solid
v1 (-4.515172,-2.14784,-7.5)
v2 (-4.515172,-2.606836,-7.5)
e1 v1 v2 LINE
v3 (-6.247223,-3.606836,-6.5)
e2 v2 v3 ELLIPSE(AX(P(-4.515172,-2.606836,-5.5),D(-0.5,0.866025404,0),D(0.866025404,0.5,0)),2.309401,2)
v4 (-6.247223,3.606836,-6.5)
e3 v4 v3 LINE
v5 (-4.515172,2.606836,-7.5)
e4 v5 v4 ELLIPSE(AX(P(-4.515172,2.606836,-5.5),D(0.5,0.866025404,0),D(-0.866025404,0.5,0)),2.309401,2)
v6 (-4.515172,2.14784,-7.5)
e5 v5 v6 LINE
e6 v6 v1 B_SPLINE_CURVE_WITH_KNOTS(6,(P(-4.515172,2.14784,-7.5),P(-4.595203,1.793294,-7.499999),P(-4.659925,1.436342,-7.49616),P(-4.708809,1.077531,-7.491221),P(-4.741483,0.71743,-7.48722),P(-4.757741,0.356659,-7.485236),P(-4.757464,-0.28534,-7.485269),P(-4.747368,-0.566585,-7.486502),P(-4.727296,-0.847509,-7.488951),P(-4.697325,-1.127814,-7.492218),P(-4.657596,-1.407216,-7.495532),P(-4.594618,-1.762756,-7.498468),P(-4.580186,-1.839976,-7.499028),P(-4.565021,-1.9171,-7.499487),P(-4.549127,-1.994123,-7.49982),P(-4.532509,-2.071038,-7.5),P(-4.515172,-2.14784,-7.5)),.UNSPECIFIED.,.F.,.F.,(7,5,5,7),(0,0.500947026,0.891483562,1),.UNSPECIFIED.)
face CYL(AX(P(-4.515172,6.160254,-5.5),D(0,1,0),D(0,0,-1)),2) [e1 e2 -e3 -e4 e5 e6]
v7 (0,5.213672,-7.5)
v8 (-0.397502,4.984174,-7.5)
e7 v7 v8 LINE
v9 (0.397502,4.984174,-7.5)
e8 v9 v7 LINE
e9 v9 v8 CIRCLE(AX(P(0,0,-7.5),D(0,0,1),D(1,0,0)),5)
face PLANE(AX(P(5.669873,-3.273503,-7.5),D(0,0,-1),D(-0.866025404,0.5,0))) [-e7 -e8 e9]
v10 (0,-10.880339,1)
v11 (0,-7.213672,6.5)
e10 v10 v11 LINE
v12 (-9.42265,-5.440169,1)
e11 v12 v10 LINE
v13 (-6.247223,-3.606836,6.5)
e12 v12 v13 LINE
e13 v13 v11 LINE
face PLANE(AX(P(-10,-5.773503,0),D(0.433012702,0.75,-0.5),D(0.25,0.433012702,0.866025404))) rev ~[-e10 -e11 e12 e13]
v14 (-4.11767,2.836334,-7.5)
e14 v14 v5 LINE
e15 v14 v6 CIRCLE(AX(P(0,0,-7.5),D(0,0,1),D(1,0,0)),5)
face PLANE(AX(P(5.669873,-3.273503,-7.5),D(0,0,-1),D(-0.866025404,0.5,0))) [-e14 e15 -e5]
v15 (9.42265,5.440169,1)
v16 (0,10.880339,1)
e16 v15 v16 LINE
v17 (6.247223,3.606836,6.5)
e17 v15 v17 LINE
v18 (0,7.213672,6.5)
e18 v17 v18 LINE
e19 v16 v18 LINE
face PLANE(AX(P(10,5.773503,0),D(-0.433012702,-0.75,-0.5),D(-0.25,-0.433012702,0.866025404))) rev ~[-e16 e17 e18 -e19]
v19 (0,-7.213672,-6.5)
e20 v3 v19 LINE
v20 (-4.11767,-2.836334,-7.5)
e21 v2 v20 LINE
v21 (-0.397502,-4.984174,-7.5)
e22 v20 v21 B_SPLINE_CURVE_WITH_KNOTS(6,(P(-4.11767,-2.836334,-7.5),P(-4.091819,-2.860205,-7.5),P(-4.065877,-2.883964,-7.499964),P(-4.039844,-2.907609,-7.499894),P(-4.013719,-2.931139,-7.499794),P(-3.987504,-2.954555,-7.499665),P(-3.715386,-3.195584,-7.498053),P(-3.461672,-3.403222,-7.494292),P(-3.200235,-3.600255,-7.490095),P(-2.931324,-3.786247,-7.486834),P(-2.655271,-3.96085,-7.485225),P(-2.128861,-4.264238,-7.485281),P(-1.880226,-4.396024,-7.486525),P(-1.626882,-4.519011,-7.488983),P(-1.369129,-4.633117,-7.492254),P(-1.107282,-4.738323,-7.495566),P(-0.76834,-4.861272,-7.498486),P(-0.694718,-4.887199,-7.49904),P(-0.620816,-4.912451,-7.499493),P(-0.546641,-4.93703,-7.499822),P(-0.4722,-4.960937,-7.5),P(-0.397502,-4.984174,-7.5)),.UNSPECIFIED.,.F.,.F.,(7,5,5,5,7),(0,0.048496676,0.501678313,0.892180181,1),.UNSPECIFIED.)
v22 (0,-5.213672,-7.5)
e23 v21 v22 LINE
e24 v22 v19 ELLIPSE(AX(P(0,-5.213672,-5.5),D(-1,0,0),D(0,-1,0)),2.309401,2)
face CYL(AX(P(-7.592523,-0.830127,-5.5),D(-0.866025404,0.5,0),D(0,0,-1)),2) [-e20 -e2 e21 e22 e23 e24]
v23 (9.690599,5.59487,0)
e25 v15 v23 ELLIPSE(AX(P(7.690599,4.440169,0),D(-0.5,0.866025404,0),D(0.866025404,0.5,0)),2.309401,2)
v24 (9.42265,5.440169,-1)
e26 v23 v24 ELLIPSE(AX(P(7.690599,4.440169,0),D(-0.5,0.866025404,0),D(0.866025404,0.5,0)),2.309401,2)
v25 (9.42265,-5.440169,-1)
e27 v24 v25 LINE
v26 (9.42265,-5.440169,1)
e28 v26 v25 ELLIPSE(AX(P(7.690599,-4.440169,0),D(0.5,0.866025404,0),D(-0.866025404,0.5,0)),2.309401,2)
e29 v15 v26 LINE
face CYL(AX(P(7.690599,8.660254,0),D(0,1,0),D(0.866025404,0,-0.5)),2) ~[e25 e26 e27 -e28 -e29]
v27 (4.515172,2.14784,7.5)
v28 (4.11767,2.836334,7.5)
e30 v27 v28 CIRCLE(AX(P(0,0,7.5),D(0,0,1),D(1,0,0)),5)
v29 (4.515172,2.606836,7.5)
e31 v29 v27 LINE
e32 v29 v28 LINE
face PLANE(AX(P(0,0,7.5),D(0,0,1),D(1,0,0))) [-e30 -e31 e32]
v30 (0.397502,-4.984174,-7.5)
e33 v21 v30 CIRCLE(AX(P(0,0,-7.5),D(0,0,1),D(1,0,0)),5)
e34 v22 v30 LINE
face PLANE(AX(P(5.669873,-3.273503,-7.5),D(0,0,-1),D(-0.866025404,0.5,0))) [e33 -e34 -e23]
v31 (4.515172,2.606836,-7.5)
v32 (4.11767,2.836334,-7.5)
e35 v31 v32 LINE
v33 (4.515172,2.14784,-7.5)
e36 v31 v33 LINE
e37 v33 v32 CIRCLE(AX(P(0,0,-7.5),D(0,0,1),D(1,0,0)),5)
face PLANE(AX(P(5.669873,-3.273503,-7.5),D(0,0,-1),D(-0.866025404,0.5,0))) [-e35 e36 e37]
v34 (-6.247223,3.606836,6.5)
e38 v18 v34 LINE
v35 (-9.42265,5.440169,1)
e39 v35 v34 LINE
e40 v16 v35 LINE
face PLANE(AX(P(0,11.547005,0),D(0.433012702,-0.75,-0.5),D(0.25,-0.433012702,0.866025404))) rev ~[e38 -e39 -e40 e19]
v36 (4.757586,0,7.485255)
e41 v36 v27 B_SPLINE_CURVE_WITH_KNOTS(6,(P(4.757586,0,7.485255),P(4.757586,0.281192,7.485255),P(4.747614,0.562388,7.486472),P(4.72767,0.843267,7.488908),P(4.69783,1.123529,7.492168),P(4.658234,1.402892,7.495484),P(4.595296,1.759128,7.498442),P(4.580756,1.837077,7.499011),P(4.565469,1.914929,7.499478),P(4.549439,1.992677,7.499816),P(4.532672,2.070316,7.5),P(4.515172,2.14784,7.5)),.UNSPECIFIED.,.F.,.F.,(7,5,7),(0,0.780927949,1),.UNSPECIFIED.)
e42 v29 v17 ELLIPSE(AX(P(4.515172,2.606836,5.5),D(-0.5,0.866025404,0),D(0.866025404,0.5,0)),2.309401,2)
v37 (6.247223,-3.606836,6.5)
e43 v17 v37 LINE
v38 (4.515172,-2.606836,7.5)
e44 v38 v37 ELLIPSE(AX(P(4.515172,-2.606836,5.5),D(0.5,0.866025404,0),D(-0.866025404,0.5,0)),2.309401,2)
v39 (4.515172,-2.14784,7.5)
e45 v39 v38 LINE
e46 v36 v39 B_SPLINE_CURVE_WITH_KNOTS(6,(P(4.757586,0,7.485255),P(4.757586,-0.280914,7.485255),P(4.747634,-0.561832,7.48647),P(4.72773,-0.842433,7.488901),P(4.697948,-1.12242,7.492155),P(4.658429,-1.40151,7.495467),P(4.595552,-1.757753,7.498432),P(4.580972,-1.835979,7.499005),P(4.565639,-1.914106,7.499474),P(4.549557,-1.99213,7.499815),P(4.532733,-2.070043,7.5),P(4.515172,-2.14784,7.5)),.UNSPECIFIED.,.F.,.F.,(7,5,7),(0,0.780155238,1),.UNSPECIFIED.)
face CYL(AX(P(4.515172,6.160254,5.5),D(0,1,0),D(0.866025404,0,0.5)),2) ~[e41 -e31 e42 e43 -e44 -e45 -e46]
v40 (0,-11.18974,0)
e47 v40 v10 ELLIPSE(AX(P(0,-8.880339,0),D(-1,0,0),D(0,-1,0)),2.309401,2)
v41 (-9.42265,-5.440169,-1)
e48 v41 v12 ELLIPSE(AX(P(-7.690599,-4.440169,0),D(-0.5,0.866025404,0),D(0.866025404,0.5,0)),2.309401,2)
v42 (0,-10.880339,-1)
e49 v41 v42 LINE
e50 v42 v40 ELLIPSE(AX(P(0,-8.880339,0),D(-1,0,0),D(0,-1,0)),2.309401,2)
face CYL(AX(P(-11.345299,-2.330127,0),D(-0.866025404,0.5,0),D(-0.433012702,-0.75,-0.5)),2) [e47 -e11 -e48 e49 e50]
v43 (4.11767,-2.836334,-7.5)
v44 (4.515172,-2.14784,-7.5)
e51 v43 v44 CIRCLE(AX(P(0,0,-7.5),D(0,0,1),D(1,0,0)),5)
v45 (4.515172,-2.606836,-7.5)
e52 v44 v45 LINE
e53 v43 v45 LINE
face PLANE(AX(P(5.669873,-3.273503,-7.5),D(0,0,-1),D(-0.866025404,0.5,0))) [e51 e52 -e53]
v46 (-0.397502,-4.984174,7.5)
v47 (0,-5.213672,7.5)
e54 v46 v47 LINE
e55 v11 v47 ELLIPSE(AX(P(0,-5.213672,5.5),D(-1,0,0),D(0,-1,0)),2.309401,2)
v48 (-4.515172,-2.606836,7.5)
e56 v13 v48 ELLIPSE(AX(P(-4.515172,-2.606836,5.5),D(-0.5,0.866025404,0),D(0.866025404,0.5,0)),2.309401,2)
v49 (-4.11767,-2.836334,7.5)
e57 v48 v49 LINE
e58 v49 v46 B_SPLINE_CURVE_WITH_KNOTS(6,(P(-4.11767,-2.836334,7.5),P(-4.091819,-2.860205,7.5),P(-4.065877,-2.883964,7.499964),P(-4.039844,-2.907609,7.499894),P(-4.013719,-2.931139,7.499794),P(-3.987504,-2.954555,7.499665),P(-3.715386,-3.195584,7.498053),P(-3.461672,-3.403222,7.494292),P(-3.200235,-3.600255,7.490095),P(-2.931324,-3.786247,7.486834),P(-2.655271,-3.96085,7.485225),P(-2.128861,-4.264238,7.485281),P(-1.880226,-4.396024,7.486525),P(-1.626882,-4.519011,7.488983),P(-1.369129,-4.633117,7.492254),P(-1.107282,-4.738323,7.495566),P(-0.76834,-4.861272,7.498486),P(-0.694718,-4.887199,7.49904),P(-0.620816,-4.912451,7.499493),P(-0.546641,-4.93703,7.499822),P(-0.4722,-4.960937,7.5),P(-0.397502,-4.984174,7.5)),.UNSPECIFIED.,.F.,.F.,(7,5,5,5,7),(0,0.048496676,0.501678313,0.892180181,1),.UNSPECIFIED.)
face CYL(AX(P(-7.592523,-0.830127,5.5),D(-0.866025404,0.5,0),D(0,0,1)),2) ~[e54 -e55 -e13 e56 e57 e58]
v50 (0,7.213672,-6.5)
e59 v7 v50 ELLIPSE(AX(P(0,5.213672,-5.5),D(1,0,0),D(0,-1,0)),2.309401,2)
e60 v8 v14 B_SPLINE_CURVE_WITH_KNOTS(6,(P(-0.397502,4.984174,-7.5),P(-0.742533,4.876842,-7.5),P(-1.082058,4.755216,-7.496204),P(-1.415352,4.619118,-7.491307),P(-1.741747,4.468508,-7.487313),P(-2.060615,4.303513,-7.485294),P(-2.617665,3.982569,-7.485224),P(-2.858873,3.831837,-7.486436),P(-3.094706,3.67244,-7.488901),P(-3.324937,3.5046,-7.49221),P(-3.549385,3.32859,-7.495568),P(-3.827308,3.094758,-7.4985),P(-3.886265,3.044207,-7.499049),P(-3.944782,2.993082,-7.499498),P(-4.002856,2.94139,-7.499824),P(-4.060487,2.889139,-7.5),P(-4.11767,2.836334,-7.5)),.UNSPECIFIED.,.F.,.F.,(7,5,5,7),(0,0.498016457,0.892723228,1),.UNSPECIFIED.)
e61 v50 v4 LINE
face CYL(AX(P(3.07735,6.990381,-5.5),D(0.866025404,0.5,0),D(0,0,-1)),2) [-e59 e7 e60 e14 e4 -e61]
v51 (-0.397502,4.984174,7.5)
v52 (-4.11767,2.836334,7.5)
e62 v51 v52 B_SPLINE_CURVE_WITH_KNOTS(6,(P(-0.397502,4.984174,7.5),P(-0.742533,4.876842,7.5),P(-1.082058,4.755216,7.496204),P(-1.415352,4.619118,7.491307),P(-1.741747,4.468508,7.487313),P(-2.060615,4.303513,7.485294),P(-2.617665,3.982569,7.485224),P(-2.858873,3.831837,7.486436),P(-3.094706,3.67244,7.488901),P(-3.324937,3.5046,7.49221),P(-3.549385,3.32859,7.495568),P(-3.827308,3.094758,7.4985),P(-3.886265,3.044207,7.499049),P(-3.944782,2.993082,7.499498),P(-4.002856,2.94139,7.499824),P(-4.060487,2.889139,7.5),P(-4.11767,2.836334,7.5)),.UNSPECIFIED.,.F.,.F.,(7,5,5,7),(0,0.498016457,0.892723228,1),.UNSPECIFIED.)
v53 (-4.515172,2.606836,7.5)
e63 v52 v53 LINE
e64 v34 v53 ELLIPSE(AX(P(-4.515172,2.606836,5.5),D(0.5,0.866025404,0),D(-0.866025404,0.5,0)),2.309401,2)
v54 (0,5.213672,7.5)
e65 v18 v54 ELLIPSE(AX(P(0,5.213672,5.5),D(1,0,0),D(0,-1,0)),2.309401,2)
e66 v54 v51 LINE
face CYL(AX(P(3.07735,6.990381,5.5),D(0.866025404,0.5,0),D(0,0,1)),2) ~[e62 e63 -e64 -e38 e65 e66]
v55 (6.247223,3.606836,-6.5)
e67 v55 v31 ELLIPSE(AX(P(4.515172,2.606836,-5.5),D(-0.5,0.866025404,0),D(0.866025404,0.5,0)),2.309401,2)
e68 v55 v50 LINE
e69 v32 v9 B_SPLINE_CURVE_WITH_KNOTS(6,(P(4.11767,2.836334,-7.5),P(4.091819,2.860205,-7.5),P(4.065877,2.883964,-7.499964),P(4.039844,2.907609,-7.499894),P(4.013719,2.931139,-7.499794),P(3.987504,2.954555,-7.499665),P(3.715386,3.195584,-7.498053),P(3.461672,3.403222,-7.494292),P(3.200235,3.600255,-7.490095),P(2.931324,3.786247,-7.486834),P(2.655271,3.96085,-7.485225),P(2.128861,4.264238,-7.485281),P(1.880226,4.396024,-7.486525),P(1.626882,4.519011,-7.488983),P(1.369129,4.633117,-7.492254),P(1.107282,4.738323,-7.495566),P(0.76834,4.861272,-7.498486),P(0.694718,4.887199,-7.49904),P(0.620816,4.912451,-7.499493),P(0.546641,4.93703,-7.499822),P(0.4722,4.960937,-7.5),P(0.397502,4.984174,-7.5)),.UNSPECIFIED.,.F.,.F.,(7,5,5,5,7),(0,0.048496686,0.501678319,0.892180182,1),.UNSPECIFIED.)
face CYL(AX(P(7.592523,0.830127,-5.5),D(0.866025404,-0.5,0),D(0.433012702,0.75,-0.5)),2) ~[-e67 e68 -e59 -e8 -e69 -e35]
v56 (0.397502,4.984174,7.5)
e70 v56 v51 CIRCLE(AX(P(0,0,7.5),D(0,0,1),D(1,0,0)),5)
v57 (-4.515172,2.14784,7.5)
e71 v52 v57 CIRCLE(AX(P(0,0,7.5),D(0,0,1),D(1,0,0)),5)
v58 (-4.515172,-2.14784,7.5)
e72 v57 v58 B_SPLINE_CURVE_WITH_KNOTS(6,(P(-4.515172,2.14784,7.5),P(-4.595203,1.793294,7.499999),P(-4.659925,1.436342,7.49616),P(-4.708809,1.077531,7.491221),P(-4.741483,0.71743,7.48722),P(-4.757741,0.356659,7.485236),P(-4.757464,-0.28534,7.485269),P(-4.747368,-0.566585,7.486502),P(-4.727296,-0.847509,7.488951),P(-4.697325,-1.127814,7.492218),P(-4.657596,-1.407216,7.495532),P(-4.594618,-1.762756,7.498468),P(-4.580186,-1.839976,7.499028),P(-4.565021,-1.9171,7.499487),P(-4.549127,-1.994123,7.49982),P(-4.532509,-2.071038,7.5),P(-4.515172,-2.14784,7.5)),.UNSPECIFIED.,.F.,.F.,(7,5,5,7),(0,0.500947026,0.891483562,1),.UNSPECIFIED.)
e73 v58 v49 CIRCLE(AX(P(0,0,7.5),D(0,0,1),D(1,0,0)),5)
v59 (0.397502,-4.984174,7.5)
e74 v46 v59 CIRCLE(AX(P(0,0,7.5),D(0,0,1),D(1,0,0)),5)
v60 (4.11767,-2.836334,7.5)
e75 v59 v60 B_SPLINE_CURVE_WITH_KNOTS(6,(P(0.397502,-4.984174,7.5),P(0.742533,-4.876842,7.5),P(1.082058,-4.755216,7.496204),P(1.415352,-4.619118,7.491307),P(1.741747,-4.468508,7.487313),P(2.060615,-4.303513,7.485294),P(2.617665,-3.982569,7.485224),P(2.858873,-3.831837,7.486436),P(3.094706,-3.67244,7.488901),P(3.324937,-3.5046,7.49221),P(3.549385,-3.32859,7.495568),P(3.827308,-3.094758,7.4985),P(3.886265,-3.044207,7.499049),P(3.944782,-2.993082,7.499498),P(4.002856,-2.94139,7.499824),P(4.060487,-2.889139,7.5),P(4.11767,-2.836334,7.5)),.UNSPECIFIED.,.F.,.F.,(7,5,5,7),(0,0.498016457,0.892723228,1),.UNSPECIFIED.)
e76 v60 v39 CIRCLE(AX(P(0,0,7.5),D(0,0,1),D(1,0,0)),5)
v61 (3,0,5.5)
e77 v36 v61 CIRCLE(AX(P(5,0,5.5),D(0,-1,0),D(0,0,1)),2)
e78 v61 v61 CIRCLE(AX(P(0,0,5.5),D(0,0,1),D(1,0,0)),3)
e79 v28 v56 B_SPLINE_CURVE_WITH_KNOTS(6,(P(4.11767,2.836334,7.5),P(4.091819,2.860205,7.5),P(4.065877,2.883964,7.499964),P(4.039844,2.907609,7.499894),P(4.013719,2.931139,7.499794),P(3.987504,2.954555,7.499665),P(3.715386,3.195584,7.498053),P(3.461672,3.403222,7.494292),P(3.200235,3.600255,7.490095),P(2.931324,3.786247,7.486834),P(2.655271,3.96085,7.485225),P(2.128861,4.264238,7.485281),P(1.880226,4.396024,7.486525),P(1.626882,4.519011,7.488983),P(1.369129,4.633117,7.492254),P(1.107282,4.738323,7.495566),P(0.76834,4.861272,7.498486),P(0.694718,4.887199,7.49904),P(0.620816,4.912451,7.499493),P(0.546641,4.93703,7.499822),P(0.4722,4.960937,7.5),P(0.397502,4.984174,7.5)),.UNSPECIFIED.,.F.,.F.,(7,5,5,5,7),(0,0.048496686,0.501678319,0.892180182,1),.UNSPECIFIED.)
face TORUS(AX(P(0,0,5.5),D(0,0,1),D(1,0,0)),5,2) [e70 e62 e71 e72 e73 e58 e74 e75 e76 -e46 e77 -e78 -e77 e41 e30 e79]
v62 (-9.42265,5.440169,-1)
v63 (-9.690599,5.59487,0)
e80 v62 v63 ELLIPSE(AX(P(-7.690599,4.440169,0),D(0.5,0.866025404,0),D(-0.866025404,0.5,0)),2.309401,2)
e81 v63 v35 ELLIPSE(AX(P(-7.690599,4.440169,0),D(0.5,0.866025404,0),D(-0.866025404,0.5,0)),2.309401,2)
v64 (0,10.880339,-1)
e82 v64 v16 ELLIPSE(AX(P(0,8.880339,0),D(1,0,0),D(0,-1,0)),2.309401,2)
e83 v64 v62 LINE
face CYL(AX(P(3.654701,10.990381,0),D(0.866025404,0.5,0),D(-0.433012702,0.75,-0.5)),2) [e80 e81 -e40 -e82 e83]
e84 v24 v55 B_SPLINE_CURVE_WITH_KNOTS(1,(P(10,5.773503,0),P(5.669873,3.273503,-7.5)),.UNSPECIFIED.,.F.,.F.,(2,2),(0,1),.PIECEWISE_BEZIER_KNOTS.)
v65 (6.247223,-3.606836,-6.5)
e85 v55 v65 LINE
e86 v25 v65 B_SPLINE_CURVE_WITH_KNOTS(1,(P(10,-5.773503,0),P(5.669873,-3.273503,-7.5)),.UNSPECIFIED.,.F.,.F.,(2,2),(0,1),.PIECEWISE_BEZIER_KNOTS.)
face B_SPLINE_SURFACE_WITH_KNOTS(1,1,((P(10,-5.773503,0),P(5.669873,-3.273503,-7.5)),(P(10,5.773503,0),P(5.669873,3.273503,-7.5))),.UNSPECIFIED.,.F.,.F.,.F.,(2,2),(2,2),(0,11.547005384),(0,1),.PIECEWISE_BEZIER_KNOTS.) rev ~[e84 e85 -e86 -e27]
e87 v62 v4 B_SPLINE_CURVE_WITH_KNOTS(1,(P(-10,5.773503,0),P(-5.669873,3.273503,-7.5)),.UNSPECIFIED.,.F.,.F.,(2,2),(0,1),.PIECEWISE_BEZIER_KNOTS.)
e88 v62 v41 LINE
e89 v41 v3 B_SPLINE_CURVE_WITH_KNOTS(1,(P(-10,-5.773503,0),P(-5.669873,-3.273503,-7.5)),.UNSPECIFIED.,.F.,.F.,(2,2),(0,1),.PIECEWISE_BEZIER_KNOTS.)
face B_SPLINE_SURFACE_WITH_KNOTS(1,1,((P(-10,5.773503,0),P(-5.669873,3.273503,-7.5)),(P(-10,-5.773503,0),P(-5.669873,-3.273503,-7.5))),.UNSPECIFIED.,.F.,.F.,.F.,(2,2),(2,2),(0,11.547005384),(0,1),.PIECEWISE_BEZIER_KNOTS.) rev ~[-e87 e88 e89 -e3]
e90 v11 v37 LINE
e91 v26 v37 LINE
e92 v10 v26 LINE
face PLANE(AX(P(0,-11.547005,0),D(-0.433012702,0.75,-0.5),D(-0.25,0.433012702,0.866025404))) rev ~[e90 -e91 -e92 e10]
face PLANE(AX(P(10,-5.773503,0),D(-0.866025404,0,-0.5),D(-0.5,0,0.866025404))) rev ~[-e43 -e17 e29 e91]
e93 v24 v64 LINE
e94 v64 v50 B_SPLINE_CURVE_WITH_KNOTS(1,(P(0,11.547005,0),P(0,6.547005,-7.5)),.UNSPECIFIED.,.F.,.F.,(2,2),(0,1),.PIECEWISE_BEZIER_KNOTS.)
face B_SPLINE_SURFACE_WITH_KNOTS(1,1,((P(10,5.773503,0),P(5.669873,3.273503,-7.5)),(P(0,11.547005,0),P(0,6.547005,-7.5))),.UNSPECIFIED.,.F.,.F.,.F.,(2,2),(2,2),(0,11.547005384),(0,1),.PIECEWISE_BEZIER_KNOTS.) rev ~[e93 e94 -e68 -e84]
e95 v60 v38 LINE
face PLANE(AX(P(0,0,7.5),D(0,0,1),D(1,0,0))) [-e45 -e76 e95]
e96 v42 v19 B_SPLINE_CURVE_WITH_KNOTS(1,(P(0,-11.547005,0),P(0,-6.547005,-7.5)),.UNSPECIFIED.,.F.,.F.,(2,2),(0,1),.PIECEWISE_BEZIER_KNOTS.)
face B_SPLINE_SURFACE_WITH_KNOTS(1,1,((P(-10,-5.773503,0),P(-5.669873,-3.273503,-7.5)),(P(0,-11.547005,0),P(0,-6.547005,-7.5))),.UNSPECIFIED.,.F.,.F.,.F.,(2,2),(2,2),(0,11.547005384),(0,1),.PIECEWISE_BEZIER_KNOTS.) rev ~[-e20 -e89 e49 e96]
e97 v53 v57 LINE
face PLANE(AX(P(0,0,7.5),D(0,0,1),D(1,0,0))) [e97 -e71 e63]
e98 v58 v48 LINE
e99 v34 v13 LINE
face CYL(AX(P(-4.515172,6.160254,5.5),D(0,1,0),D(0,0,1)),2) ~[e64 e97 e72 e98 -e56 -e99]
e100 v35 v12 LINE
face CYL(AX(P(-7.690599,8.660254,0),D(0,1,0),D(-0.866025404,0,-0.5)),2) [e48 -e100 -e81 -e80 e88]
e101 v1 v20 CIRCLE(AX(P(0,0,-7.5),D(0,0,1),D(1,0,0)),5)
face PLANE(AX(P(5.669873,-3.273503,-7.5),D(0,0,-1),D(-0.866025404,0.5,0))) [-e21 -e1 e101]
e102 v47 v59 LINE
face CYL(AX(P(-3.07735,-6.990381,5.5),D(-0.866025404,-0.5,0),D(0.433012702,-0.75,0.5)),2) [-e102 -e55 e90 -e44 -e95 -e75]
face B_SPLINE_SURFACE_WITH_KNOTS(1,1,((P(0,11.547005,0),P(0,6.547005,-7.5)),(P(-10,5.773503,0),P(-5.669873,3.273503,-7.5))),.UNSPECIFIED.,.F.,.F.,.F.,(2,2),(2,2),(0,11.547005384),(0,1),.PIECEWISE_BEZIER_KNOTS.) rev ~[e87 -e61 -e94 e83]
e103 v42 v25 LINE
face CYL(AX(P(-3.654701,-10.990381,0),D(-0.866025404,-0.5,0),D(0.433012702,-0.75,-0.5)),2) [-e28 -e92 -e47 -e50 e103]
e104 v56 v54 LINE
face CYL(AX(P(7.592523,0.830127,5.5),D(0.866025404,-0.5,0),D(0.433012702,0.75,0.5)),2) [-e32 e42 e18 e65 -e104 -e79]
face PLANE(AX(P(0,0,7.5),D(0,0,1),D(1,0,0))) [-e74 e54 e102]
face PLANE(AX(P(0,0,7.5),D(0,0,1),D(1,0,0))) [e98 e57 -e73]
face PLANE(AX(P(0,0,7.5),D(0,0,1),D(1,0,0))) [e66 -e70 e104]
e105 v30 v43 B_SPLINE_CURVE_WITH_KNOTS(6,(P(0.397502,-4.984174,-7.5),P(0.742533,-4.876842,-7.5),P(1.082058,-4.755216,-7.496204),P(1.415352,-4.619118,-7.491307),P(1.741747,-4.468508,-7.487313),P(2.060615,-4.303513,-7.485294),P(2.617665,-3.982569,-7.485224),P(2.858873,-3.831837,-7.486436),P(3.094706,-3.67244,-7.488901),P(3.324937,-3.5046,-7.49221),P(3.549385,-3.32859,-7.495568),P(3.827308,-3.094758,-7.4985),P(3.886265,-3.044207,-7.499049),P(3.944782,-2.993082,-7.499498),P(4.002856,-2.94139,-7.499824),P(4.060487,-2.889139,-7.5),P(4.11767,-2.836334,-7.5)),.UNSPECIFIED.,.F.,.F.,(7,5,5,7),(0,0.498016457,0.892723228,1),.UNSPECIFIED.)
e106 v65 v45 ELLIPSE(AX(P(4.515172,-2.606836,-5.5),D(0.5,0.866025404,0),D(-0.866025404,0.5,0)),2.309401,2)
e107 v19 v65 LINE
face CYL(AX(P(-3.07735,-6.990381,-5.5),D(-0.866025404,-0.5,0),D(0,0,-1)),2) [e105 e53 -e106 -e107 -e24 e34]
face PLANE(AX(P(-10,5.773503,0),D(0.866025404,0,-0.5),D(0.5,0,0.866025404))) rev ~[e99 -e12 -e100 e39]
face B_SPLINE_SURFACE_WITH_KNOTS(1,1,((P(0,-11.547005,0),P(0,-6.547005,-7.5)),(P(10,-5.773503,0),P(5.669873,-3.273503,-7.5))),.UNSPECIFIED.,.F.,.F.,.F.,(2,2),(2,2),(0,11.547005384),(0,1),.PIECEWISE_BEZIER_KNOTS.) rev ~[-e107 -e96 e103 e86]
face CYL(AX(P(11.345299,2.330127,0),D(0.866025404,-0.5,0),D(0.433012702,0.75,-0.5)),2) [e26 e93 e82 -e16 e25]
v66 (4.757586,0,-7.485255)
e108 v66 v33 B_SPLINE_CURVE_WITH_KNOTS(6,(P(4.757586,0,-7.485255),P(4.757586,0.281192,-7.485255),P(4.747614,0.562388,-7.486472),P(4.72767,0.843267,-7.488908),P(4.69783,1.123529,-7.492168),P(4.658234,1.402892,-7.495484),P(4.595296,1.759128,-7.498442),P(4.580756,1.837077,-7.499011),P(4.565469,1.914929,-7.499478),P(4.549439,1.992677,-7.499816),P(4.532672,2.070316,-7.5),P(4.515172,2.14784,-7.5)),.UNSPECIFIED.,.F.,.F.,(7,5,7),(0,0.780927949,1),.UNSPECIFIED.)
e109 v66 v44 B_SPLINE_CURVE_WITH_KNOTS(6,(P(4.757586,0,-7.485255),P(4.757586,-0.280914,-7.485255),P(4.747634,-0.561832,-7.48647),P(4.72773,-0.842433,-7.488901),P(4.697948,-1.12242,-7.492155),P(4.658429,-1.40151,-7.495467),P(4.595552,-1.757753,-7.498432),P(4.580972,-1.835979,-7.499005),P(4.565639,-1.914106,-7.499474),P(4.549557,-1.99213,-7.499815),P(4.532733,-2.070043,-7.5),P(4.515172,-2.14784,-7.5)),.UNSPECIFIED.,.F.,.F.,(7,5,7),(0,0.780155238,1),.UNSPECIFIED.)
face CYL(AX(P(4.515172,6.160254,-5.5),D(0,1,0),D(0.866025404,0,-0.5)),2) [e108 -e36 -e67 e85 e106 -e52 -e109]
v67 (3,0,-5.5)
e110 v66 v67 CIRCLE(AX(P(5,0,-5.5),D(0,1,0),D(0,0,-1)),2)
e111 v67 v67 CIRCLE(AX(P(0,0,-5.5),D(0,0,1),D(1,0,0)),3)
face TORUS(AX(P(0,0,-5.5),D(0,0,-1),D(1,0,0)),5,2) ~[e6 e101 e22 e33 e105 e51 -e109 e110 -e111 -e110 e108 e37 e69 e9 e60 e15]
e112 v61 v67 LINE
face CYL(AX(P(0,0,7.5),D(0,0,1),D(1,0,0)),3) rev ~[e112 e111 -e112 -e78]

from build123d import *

# Parameters (mm, degrees)
F1_DEPTH     = 7.5
F1_TAPER     = 30
F2_R         = 3
F3_DEPTH     = 15.0010001
F4_T1_DEPTH  = 17.3205080757
F4_T3_DEPTH  = 12.3205080757
F4_T5_DEPTH  = 17.3205080757
F4_T7_DEPTH  = 12.3205080757
F4_T9_DEPTH  = 12.3205080757
F4_T11_DEPTH = 12.3205080757
F4_T13_DEPTH = 12.3205080757
F4_T15_DEPTH = 17.3205080757
F4_T17_DEPTH = 17.3205080757
F4_T19_DEPTH = 17.3205080757


# Not quite as in the source:
# - a fillet or chamfer that OpenCascade refuses, or shapes differently, is made with other operations: its cross-section is extruded or revolved along the edge and cut away or added


with BuildPart() as f1:
    # F0 (on Top) → F1 (new body, symmetric)
    with BuildSketch(Plane.XY):
        Polygon((10, -5.7735026919), (10, 5.7735026919), (0, 11.5470053838), (-10, 5.7735026919), (-10, -5.7735026919), (0, -11.5470053838), align=None)
    extrude(amount=F1_DEPTH, both=True, taper=F1_TAPER)

    # F2 (on face) → F3 (cut, through all)
    with BuildSketch(Plane.XY.offset(7.5)):
        Circle(F2_R)
    extrude(amount=-F3_DEPTH, mode=Mode.SUBTRACT)

    # F4: fillet of radius 2 on 21 edges, made by hand

    # F4_s2 → F4_t1 (cut)
    with BuildSketch(Plane.XZ.offset(-8.6602540378)):
        with BuildLine():
            ThreePointArc((9.4226497308, -1), (9.6905989232, 0), (9.4226497308, 1))
            Line((9.4226497308, 1), (10, 0))
            Line((10, 0), (9.4226497308, -1))
        make_face()
        with BuildLine():
            ThreePointArc((-9.4226497308, -1), (-9.6905989232, 0), (-9.4226497308, 1))
            Line((-9.4226497308, 1), (-10, 0))
            Line((-10, 0), (-9.4226497308, -1))
        make_face()
    extrude(amount=F4_T1_DEPTH, mode=Mode.SUBTRACT)

    # F4_s4 → F4_t3 (cut)
    with BuildSketch(Plane.XZ.offset(-6.1602540378)):
        with BuildLine():
            ThreePointArc((6.2472232503, -6.5), (5.5151724427, -7.2320508076), (4.5151724427, -7.5))
            Line((4.5151724427, -7.5), (5.6698729811, -7.5))
            Line((5.6698729811, -7.5), (6.2472232503, -6.5))
        make_face()
        with BuildLine():
            ThreePointArc((6.2472232503, 6.5), (5.5151724427, 7.2320508076), (4.5151724427, 7.5))
            Line((4.5151724427, 7.5), (5.6698729811, 7.5))
            Line((5.6698729811, 7.5), (6.2472232503, 6.5))
        make_face()
        with BuildLine():
            ThreePointArc((-4.5151724427, -7.5), (-5.5151724427, -7.2320508076), (-6.2472232503, -6.5))
            Line((-6.2472232503, -6.5), (-5.6698729811, -7.5))
            Line((-5.6698729811, -7.5), (-4.5151724427, -7.5))
        make_face()
        with BuildLine():
            ThreePointArc((-4.5151724427, 7.5), (-5.5151724427, 7.2320508076), (-6.2472232503, 6.5))
            Line((-6.2472232503, 6.5), (-5.6698729811, 7.5))
            Line((-5.6698729811, 7.5), (-4.5151724427, 7.5))
        make_face()
    extrude(amount=F4_T3_DEPTH, mode=Mode.SUBTRACT)

    # F4_s6 → F4_t5 (cut)
    with BuildSketch(Plane(origin=(7.5, -4.3301270189, 0), x_dir=(0, 0, 1), z_dir=(-0.8660254038, 0.5, 0))):
        with BuildLine():
            ThreePointArc((-1, 9.4226497308), (0, 9.6905989232), (1, 9.4226497308))
            Line((1, 9.4226497308), (0, 10))
            Line((0, 10), (-1, 9.4226497308))
        make_face()
    extrude(amount=F4_T5_DEPTH, mode=Mode.SUBTRACT)

    # F4_s8 → F4_t7 (cut)
    with BuildSketch(Plane(origin=(5.3349364905, -3.0801270189, 0), x_dir=(0, 0, 1), z_dir=(-0.8660254038, 0.5, 0))):
        with BuildLine():
            ThreePointArc((-6.5, 6.2472232503), (-7.2320508076, 5.5151724427), (-7.5, 4.5151724427))
            Line((-7.5, 4.5151724427), (-7.5, 5.6698729811))
            Line((-7.5, 5.6698729811), (-6.5, 6.2472232503))
        make_face()
        with BuildLine():
            ThreePointArc((6.5, 6.2472232503), (7.2320508076, 5.5151724427), (7.5, 4.5151724427))
            Line((7.5, 4.5151724427), (7.5, 5.6698729811))
            Line((7.5, 5.6698729811), (6.5, 6.2472232503))
        make_face()
    extrude(amount=F4_T7_DEPTH, mode=Mode.SUBTRACT)

    # F4_s10 → F4_t9 (cut)
    with BuildSketch(Plane(origin=(-5.3349364905, -3.0801270189, 0), x_dir=(0, 0, 1), z_dir=(0.8660254038, 0.5, 0))):
        with BuildLine():
            ThreePointArc((-7.5, 4.5151724427), (-7.2320508076, 5.5151724427), (-6.5, 6.2472232503))
            Line((-6.5, 6.2472232503), (-7.5, 5.6698729811))
            Line((-7.5, 5.6698729811), (-7.5, 4.5151724427))
        make_face()
        with BuildLine():
            ThreePointArc((6.5, 6.2472232503), (7.2320508076, 5.5151724427), (7.5, 4.5151724427))
            Line((7.5, 4.5151724427), (7.5, 5.6698729811))
            Line((7.5, 5.6698729811), (6.5, 6.2472232503))
        make_face()
    extrude(amount=F4_T9_DEPTH, mode=Mode.SUBTRACT)

    # F4_s12 → F4_t11 (cut)
    with BuildSketch(Plane(origin=(-5.3349364905, 3.0801270189, 0), x_dir=(0, 0, 1), z_dir=(0.8660254038, -0.5, 0))):
        with BuildLine():
            ThreePointArc((-7.5, 4.5151724427), (-7.2320508076, 5.5151724427), (-6.5, 6.2472232503))
            Line((-6.5, 6.2472232503), (-7.5, 5.6698729811))
            Line((-7.5, 5.6698729811), (-7.5, 4.5151724427))
        make_face()
        with BuildLine():
            ThreePointArc((7.5, 4.5151724427), (7.2320508076, 5.5151724427), (6.5, 6.2472232503))
            Line((6.5, 6.2472232503), (7.5, 5.6698729811))
            Line((7.5, 5.6698729811), (7.5, 4.5151724427))
        make_face()
    extrude(amount=F4_T11_DEPTH, mode=Mode.SUBTRACT)

    # F4_s14 → F4_t13 (cut)
    with BuildSketch(Plane(origin=(5.3349364905, 3.0801270189, 0), x_dir=(0, 0, 1), z_dir=(-0.8660254038, -0.5, 0))):
        with BuildLine():
            ThreePointArc((-7.5, 4.5151724427), (-7.2320508076, 5.5151724427), (-6.5, 6.2472232503))
            Line((-6.5, 6.2472232503), (-7.5, 5.6698729811))
            Line((-7.5, 5.6698729811), (-7.5, 4.5151724427))
        make_face()
        with BuildLine():
            ThreePointArc((7.5, 4.5151724427), (7.2320508076, 5.5151724427), (6.5, 6.2472232503))
            Line((6.5, 6.2472232503), (7.5, 5.6698729811))
            Line((7.5, 5.6698729811), (7.5, 4.5151724427))
        make_face()
    extrude(amount=F4_T13_DEPTH, mode=Mode.SUBTRACT)

    # F4_s16 → F4_t15 (cut)
    with BuildSketch(Plane(origin=(-7.5, -4.3301270189, 0), x_dir=(0, 0, 1), z_dir=(0.8660254038, 0.5, 0))):
        with BuildLine():
            ThreePointArc((-1, 9.4226497308), (0, 9.6905989232), (1, 9.4226497308))
            Line((1, 9.4226497308), (0, 10))
            Line((0, 10), (-1, 9.4226497308))
        make_face()
    extrude(amount=F4_T15_DEPTH, mode=Mode.SUBTRACT)

    # F4_s18 → F4_t17 (cut)
    with BuildSketch(Plane(origin=(7.5, 4.3301270189, 0), x_dir=(0, 0, 1), z_dir=(-0.8660254038, -0.5, 0))):
        with BuildLine():
            ThreePointArc((-1, 9.4226497308), (0, 9.6905989232), (1, 9.4226497308))
            Line((1, 9.4226497308), (0, 10))
            Line((0, 10), (-1, 9.4226497308))
        make_face()
    extrude(amount=F4_T17_DEPTH, mode=Mode.SUBTRACT)

    # F4_s20 → F4_t19 (cut)
    with BuildSketch(Plane(origin=(-7.5, 4.3301270189, 0), x_dir=(0, 0, 1), z_dir=(0.8660254038, -0.5, 0))):
        with BuildLine():
            ThreePointArc((-1, 9.4226497308), (0, 9.6905989232), (1, 9.4226497308))
            Line((1, 9.4226497308), (0, 10))
            Line((0, 10), (-1, 9.4226497308))
        make_face()
    extrude(amount=F4_T19_DEPTH, mode=Mode.SUBTRACT)

    # F4_s21 → F4_t22 (revolve, cut)
    with BuildSketch(Plane.XZ):
        with BuildLine():
            ThreePointArc((5, -7.5), (3.5857864376, -6.9142135624), (3, -5.5))
            Line((3, -5.5), (3, -7.5))
            Line((3, -7.5), (5, -7.5))
        make_face()
    revolve(axis=Axis((0, 0, -7.5), (0, 0, 1)), mode=Mode.SUBTRACT)

    # F4_s23 → F4_t24 (revolve, cut)
    with BuildSketch(Plane.XZ):
        with BuildLine():
            ThreePointArc((5, 7.5), (3.5857864376, 6.9142135624), (3, 5.5))
            Line((3, 5.5), (3, 7.5))
            Line((3, 7.5), (5, 7.5))
        make_face()
    revolve(axis=Axis((0, 0, 7.5), (0, 0, 1)), mode=Mode.SUBTRACT)


solid = f1.part
